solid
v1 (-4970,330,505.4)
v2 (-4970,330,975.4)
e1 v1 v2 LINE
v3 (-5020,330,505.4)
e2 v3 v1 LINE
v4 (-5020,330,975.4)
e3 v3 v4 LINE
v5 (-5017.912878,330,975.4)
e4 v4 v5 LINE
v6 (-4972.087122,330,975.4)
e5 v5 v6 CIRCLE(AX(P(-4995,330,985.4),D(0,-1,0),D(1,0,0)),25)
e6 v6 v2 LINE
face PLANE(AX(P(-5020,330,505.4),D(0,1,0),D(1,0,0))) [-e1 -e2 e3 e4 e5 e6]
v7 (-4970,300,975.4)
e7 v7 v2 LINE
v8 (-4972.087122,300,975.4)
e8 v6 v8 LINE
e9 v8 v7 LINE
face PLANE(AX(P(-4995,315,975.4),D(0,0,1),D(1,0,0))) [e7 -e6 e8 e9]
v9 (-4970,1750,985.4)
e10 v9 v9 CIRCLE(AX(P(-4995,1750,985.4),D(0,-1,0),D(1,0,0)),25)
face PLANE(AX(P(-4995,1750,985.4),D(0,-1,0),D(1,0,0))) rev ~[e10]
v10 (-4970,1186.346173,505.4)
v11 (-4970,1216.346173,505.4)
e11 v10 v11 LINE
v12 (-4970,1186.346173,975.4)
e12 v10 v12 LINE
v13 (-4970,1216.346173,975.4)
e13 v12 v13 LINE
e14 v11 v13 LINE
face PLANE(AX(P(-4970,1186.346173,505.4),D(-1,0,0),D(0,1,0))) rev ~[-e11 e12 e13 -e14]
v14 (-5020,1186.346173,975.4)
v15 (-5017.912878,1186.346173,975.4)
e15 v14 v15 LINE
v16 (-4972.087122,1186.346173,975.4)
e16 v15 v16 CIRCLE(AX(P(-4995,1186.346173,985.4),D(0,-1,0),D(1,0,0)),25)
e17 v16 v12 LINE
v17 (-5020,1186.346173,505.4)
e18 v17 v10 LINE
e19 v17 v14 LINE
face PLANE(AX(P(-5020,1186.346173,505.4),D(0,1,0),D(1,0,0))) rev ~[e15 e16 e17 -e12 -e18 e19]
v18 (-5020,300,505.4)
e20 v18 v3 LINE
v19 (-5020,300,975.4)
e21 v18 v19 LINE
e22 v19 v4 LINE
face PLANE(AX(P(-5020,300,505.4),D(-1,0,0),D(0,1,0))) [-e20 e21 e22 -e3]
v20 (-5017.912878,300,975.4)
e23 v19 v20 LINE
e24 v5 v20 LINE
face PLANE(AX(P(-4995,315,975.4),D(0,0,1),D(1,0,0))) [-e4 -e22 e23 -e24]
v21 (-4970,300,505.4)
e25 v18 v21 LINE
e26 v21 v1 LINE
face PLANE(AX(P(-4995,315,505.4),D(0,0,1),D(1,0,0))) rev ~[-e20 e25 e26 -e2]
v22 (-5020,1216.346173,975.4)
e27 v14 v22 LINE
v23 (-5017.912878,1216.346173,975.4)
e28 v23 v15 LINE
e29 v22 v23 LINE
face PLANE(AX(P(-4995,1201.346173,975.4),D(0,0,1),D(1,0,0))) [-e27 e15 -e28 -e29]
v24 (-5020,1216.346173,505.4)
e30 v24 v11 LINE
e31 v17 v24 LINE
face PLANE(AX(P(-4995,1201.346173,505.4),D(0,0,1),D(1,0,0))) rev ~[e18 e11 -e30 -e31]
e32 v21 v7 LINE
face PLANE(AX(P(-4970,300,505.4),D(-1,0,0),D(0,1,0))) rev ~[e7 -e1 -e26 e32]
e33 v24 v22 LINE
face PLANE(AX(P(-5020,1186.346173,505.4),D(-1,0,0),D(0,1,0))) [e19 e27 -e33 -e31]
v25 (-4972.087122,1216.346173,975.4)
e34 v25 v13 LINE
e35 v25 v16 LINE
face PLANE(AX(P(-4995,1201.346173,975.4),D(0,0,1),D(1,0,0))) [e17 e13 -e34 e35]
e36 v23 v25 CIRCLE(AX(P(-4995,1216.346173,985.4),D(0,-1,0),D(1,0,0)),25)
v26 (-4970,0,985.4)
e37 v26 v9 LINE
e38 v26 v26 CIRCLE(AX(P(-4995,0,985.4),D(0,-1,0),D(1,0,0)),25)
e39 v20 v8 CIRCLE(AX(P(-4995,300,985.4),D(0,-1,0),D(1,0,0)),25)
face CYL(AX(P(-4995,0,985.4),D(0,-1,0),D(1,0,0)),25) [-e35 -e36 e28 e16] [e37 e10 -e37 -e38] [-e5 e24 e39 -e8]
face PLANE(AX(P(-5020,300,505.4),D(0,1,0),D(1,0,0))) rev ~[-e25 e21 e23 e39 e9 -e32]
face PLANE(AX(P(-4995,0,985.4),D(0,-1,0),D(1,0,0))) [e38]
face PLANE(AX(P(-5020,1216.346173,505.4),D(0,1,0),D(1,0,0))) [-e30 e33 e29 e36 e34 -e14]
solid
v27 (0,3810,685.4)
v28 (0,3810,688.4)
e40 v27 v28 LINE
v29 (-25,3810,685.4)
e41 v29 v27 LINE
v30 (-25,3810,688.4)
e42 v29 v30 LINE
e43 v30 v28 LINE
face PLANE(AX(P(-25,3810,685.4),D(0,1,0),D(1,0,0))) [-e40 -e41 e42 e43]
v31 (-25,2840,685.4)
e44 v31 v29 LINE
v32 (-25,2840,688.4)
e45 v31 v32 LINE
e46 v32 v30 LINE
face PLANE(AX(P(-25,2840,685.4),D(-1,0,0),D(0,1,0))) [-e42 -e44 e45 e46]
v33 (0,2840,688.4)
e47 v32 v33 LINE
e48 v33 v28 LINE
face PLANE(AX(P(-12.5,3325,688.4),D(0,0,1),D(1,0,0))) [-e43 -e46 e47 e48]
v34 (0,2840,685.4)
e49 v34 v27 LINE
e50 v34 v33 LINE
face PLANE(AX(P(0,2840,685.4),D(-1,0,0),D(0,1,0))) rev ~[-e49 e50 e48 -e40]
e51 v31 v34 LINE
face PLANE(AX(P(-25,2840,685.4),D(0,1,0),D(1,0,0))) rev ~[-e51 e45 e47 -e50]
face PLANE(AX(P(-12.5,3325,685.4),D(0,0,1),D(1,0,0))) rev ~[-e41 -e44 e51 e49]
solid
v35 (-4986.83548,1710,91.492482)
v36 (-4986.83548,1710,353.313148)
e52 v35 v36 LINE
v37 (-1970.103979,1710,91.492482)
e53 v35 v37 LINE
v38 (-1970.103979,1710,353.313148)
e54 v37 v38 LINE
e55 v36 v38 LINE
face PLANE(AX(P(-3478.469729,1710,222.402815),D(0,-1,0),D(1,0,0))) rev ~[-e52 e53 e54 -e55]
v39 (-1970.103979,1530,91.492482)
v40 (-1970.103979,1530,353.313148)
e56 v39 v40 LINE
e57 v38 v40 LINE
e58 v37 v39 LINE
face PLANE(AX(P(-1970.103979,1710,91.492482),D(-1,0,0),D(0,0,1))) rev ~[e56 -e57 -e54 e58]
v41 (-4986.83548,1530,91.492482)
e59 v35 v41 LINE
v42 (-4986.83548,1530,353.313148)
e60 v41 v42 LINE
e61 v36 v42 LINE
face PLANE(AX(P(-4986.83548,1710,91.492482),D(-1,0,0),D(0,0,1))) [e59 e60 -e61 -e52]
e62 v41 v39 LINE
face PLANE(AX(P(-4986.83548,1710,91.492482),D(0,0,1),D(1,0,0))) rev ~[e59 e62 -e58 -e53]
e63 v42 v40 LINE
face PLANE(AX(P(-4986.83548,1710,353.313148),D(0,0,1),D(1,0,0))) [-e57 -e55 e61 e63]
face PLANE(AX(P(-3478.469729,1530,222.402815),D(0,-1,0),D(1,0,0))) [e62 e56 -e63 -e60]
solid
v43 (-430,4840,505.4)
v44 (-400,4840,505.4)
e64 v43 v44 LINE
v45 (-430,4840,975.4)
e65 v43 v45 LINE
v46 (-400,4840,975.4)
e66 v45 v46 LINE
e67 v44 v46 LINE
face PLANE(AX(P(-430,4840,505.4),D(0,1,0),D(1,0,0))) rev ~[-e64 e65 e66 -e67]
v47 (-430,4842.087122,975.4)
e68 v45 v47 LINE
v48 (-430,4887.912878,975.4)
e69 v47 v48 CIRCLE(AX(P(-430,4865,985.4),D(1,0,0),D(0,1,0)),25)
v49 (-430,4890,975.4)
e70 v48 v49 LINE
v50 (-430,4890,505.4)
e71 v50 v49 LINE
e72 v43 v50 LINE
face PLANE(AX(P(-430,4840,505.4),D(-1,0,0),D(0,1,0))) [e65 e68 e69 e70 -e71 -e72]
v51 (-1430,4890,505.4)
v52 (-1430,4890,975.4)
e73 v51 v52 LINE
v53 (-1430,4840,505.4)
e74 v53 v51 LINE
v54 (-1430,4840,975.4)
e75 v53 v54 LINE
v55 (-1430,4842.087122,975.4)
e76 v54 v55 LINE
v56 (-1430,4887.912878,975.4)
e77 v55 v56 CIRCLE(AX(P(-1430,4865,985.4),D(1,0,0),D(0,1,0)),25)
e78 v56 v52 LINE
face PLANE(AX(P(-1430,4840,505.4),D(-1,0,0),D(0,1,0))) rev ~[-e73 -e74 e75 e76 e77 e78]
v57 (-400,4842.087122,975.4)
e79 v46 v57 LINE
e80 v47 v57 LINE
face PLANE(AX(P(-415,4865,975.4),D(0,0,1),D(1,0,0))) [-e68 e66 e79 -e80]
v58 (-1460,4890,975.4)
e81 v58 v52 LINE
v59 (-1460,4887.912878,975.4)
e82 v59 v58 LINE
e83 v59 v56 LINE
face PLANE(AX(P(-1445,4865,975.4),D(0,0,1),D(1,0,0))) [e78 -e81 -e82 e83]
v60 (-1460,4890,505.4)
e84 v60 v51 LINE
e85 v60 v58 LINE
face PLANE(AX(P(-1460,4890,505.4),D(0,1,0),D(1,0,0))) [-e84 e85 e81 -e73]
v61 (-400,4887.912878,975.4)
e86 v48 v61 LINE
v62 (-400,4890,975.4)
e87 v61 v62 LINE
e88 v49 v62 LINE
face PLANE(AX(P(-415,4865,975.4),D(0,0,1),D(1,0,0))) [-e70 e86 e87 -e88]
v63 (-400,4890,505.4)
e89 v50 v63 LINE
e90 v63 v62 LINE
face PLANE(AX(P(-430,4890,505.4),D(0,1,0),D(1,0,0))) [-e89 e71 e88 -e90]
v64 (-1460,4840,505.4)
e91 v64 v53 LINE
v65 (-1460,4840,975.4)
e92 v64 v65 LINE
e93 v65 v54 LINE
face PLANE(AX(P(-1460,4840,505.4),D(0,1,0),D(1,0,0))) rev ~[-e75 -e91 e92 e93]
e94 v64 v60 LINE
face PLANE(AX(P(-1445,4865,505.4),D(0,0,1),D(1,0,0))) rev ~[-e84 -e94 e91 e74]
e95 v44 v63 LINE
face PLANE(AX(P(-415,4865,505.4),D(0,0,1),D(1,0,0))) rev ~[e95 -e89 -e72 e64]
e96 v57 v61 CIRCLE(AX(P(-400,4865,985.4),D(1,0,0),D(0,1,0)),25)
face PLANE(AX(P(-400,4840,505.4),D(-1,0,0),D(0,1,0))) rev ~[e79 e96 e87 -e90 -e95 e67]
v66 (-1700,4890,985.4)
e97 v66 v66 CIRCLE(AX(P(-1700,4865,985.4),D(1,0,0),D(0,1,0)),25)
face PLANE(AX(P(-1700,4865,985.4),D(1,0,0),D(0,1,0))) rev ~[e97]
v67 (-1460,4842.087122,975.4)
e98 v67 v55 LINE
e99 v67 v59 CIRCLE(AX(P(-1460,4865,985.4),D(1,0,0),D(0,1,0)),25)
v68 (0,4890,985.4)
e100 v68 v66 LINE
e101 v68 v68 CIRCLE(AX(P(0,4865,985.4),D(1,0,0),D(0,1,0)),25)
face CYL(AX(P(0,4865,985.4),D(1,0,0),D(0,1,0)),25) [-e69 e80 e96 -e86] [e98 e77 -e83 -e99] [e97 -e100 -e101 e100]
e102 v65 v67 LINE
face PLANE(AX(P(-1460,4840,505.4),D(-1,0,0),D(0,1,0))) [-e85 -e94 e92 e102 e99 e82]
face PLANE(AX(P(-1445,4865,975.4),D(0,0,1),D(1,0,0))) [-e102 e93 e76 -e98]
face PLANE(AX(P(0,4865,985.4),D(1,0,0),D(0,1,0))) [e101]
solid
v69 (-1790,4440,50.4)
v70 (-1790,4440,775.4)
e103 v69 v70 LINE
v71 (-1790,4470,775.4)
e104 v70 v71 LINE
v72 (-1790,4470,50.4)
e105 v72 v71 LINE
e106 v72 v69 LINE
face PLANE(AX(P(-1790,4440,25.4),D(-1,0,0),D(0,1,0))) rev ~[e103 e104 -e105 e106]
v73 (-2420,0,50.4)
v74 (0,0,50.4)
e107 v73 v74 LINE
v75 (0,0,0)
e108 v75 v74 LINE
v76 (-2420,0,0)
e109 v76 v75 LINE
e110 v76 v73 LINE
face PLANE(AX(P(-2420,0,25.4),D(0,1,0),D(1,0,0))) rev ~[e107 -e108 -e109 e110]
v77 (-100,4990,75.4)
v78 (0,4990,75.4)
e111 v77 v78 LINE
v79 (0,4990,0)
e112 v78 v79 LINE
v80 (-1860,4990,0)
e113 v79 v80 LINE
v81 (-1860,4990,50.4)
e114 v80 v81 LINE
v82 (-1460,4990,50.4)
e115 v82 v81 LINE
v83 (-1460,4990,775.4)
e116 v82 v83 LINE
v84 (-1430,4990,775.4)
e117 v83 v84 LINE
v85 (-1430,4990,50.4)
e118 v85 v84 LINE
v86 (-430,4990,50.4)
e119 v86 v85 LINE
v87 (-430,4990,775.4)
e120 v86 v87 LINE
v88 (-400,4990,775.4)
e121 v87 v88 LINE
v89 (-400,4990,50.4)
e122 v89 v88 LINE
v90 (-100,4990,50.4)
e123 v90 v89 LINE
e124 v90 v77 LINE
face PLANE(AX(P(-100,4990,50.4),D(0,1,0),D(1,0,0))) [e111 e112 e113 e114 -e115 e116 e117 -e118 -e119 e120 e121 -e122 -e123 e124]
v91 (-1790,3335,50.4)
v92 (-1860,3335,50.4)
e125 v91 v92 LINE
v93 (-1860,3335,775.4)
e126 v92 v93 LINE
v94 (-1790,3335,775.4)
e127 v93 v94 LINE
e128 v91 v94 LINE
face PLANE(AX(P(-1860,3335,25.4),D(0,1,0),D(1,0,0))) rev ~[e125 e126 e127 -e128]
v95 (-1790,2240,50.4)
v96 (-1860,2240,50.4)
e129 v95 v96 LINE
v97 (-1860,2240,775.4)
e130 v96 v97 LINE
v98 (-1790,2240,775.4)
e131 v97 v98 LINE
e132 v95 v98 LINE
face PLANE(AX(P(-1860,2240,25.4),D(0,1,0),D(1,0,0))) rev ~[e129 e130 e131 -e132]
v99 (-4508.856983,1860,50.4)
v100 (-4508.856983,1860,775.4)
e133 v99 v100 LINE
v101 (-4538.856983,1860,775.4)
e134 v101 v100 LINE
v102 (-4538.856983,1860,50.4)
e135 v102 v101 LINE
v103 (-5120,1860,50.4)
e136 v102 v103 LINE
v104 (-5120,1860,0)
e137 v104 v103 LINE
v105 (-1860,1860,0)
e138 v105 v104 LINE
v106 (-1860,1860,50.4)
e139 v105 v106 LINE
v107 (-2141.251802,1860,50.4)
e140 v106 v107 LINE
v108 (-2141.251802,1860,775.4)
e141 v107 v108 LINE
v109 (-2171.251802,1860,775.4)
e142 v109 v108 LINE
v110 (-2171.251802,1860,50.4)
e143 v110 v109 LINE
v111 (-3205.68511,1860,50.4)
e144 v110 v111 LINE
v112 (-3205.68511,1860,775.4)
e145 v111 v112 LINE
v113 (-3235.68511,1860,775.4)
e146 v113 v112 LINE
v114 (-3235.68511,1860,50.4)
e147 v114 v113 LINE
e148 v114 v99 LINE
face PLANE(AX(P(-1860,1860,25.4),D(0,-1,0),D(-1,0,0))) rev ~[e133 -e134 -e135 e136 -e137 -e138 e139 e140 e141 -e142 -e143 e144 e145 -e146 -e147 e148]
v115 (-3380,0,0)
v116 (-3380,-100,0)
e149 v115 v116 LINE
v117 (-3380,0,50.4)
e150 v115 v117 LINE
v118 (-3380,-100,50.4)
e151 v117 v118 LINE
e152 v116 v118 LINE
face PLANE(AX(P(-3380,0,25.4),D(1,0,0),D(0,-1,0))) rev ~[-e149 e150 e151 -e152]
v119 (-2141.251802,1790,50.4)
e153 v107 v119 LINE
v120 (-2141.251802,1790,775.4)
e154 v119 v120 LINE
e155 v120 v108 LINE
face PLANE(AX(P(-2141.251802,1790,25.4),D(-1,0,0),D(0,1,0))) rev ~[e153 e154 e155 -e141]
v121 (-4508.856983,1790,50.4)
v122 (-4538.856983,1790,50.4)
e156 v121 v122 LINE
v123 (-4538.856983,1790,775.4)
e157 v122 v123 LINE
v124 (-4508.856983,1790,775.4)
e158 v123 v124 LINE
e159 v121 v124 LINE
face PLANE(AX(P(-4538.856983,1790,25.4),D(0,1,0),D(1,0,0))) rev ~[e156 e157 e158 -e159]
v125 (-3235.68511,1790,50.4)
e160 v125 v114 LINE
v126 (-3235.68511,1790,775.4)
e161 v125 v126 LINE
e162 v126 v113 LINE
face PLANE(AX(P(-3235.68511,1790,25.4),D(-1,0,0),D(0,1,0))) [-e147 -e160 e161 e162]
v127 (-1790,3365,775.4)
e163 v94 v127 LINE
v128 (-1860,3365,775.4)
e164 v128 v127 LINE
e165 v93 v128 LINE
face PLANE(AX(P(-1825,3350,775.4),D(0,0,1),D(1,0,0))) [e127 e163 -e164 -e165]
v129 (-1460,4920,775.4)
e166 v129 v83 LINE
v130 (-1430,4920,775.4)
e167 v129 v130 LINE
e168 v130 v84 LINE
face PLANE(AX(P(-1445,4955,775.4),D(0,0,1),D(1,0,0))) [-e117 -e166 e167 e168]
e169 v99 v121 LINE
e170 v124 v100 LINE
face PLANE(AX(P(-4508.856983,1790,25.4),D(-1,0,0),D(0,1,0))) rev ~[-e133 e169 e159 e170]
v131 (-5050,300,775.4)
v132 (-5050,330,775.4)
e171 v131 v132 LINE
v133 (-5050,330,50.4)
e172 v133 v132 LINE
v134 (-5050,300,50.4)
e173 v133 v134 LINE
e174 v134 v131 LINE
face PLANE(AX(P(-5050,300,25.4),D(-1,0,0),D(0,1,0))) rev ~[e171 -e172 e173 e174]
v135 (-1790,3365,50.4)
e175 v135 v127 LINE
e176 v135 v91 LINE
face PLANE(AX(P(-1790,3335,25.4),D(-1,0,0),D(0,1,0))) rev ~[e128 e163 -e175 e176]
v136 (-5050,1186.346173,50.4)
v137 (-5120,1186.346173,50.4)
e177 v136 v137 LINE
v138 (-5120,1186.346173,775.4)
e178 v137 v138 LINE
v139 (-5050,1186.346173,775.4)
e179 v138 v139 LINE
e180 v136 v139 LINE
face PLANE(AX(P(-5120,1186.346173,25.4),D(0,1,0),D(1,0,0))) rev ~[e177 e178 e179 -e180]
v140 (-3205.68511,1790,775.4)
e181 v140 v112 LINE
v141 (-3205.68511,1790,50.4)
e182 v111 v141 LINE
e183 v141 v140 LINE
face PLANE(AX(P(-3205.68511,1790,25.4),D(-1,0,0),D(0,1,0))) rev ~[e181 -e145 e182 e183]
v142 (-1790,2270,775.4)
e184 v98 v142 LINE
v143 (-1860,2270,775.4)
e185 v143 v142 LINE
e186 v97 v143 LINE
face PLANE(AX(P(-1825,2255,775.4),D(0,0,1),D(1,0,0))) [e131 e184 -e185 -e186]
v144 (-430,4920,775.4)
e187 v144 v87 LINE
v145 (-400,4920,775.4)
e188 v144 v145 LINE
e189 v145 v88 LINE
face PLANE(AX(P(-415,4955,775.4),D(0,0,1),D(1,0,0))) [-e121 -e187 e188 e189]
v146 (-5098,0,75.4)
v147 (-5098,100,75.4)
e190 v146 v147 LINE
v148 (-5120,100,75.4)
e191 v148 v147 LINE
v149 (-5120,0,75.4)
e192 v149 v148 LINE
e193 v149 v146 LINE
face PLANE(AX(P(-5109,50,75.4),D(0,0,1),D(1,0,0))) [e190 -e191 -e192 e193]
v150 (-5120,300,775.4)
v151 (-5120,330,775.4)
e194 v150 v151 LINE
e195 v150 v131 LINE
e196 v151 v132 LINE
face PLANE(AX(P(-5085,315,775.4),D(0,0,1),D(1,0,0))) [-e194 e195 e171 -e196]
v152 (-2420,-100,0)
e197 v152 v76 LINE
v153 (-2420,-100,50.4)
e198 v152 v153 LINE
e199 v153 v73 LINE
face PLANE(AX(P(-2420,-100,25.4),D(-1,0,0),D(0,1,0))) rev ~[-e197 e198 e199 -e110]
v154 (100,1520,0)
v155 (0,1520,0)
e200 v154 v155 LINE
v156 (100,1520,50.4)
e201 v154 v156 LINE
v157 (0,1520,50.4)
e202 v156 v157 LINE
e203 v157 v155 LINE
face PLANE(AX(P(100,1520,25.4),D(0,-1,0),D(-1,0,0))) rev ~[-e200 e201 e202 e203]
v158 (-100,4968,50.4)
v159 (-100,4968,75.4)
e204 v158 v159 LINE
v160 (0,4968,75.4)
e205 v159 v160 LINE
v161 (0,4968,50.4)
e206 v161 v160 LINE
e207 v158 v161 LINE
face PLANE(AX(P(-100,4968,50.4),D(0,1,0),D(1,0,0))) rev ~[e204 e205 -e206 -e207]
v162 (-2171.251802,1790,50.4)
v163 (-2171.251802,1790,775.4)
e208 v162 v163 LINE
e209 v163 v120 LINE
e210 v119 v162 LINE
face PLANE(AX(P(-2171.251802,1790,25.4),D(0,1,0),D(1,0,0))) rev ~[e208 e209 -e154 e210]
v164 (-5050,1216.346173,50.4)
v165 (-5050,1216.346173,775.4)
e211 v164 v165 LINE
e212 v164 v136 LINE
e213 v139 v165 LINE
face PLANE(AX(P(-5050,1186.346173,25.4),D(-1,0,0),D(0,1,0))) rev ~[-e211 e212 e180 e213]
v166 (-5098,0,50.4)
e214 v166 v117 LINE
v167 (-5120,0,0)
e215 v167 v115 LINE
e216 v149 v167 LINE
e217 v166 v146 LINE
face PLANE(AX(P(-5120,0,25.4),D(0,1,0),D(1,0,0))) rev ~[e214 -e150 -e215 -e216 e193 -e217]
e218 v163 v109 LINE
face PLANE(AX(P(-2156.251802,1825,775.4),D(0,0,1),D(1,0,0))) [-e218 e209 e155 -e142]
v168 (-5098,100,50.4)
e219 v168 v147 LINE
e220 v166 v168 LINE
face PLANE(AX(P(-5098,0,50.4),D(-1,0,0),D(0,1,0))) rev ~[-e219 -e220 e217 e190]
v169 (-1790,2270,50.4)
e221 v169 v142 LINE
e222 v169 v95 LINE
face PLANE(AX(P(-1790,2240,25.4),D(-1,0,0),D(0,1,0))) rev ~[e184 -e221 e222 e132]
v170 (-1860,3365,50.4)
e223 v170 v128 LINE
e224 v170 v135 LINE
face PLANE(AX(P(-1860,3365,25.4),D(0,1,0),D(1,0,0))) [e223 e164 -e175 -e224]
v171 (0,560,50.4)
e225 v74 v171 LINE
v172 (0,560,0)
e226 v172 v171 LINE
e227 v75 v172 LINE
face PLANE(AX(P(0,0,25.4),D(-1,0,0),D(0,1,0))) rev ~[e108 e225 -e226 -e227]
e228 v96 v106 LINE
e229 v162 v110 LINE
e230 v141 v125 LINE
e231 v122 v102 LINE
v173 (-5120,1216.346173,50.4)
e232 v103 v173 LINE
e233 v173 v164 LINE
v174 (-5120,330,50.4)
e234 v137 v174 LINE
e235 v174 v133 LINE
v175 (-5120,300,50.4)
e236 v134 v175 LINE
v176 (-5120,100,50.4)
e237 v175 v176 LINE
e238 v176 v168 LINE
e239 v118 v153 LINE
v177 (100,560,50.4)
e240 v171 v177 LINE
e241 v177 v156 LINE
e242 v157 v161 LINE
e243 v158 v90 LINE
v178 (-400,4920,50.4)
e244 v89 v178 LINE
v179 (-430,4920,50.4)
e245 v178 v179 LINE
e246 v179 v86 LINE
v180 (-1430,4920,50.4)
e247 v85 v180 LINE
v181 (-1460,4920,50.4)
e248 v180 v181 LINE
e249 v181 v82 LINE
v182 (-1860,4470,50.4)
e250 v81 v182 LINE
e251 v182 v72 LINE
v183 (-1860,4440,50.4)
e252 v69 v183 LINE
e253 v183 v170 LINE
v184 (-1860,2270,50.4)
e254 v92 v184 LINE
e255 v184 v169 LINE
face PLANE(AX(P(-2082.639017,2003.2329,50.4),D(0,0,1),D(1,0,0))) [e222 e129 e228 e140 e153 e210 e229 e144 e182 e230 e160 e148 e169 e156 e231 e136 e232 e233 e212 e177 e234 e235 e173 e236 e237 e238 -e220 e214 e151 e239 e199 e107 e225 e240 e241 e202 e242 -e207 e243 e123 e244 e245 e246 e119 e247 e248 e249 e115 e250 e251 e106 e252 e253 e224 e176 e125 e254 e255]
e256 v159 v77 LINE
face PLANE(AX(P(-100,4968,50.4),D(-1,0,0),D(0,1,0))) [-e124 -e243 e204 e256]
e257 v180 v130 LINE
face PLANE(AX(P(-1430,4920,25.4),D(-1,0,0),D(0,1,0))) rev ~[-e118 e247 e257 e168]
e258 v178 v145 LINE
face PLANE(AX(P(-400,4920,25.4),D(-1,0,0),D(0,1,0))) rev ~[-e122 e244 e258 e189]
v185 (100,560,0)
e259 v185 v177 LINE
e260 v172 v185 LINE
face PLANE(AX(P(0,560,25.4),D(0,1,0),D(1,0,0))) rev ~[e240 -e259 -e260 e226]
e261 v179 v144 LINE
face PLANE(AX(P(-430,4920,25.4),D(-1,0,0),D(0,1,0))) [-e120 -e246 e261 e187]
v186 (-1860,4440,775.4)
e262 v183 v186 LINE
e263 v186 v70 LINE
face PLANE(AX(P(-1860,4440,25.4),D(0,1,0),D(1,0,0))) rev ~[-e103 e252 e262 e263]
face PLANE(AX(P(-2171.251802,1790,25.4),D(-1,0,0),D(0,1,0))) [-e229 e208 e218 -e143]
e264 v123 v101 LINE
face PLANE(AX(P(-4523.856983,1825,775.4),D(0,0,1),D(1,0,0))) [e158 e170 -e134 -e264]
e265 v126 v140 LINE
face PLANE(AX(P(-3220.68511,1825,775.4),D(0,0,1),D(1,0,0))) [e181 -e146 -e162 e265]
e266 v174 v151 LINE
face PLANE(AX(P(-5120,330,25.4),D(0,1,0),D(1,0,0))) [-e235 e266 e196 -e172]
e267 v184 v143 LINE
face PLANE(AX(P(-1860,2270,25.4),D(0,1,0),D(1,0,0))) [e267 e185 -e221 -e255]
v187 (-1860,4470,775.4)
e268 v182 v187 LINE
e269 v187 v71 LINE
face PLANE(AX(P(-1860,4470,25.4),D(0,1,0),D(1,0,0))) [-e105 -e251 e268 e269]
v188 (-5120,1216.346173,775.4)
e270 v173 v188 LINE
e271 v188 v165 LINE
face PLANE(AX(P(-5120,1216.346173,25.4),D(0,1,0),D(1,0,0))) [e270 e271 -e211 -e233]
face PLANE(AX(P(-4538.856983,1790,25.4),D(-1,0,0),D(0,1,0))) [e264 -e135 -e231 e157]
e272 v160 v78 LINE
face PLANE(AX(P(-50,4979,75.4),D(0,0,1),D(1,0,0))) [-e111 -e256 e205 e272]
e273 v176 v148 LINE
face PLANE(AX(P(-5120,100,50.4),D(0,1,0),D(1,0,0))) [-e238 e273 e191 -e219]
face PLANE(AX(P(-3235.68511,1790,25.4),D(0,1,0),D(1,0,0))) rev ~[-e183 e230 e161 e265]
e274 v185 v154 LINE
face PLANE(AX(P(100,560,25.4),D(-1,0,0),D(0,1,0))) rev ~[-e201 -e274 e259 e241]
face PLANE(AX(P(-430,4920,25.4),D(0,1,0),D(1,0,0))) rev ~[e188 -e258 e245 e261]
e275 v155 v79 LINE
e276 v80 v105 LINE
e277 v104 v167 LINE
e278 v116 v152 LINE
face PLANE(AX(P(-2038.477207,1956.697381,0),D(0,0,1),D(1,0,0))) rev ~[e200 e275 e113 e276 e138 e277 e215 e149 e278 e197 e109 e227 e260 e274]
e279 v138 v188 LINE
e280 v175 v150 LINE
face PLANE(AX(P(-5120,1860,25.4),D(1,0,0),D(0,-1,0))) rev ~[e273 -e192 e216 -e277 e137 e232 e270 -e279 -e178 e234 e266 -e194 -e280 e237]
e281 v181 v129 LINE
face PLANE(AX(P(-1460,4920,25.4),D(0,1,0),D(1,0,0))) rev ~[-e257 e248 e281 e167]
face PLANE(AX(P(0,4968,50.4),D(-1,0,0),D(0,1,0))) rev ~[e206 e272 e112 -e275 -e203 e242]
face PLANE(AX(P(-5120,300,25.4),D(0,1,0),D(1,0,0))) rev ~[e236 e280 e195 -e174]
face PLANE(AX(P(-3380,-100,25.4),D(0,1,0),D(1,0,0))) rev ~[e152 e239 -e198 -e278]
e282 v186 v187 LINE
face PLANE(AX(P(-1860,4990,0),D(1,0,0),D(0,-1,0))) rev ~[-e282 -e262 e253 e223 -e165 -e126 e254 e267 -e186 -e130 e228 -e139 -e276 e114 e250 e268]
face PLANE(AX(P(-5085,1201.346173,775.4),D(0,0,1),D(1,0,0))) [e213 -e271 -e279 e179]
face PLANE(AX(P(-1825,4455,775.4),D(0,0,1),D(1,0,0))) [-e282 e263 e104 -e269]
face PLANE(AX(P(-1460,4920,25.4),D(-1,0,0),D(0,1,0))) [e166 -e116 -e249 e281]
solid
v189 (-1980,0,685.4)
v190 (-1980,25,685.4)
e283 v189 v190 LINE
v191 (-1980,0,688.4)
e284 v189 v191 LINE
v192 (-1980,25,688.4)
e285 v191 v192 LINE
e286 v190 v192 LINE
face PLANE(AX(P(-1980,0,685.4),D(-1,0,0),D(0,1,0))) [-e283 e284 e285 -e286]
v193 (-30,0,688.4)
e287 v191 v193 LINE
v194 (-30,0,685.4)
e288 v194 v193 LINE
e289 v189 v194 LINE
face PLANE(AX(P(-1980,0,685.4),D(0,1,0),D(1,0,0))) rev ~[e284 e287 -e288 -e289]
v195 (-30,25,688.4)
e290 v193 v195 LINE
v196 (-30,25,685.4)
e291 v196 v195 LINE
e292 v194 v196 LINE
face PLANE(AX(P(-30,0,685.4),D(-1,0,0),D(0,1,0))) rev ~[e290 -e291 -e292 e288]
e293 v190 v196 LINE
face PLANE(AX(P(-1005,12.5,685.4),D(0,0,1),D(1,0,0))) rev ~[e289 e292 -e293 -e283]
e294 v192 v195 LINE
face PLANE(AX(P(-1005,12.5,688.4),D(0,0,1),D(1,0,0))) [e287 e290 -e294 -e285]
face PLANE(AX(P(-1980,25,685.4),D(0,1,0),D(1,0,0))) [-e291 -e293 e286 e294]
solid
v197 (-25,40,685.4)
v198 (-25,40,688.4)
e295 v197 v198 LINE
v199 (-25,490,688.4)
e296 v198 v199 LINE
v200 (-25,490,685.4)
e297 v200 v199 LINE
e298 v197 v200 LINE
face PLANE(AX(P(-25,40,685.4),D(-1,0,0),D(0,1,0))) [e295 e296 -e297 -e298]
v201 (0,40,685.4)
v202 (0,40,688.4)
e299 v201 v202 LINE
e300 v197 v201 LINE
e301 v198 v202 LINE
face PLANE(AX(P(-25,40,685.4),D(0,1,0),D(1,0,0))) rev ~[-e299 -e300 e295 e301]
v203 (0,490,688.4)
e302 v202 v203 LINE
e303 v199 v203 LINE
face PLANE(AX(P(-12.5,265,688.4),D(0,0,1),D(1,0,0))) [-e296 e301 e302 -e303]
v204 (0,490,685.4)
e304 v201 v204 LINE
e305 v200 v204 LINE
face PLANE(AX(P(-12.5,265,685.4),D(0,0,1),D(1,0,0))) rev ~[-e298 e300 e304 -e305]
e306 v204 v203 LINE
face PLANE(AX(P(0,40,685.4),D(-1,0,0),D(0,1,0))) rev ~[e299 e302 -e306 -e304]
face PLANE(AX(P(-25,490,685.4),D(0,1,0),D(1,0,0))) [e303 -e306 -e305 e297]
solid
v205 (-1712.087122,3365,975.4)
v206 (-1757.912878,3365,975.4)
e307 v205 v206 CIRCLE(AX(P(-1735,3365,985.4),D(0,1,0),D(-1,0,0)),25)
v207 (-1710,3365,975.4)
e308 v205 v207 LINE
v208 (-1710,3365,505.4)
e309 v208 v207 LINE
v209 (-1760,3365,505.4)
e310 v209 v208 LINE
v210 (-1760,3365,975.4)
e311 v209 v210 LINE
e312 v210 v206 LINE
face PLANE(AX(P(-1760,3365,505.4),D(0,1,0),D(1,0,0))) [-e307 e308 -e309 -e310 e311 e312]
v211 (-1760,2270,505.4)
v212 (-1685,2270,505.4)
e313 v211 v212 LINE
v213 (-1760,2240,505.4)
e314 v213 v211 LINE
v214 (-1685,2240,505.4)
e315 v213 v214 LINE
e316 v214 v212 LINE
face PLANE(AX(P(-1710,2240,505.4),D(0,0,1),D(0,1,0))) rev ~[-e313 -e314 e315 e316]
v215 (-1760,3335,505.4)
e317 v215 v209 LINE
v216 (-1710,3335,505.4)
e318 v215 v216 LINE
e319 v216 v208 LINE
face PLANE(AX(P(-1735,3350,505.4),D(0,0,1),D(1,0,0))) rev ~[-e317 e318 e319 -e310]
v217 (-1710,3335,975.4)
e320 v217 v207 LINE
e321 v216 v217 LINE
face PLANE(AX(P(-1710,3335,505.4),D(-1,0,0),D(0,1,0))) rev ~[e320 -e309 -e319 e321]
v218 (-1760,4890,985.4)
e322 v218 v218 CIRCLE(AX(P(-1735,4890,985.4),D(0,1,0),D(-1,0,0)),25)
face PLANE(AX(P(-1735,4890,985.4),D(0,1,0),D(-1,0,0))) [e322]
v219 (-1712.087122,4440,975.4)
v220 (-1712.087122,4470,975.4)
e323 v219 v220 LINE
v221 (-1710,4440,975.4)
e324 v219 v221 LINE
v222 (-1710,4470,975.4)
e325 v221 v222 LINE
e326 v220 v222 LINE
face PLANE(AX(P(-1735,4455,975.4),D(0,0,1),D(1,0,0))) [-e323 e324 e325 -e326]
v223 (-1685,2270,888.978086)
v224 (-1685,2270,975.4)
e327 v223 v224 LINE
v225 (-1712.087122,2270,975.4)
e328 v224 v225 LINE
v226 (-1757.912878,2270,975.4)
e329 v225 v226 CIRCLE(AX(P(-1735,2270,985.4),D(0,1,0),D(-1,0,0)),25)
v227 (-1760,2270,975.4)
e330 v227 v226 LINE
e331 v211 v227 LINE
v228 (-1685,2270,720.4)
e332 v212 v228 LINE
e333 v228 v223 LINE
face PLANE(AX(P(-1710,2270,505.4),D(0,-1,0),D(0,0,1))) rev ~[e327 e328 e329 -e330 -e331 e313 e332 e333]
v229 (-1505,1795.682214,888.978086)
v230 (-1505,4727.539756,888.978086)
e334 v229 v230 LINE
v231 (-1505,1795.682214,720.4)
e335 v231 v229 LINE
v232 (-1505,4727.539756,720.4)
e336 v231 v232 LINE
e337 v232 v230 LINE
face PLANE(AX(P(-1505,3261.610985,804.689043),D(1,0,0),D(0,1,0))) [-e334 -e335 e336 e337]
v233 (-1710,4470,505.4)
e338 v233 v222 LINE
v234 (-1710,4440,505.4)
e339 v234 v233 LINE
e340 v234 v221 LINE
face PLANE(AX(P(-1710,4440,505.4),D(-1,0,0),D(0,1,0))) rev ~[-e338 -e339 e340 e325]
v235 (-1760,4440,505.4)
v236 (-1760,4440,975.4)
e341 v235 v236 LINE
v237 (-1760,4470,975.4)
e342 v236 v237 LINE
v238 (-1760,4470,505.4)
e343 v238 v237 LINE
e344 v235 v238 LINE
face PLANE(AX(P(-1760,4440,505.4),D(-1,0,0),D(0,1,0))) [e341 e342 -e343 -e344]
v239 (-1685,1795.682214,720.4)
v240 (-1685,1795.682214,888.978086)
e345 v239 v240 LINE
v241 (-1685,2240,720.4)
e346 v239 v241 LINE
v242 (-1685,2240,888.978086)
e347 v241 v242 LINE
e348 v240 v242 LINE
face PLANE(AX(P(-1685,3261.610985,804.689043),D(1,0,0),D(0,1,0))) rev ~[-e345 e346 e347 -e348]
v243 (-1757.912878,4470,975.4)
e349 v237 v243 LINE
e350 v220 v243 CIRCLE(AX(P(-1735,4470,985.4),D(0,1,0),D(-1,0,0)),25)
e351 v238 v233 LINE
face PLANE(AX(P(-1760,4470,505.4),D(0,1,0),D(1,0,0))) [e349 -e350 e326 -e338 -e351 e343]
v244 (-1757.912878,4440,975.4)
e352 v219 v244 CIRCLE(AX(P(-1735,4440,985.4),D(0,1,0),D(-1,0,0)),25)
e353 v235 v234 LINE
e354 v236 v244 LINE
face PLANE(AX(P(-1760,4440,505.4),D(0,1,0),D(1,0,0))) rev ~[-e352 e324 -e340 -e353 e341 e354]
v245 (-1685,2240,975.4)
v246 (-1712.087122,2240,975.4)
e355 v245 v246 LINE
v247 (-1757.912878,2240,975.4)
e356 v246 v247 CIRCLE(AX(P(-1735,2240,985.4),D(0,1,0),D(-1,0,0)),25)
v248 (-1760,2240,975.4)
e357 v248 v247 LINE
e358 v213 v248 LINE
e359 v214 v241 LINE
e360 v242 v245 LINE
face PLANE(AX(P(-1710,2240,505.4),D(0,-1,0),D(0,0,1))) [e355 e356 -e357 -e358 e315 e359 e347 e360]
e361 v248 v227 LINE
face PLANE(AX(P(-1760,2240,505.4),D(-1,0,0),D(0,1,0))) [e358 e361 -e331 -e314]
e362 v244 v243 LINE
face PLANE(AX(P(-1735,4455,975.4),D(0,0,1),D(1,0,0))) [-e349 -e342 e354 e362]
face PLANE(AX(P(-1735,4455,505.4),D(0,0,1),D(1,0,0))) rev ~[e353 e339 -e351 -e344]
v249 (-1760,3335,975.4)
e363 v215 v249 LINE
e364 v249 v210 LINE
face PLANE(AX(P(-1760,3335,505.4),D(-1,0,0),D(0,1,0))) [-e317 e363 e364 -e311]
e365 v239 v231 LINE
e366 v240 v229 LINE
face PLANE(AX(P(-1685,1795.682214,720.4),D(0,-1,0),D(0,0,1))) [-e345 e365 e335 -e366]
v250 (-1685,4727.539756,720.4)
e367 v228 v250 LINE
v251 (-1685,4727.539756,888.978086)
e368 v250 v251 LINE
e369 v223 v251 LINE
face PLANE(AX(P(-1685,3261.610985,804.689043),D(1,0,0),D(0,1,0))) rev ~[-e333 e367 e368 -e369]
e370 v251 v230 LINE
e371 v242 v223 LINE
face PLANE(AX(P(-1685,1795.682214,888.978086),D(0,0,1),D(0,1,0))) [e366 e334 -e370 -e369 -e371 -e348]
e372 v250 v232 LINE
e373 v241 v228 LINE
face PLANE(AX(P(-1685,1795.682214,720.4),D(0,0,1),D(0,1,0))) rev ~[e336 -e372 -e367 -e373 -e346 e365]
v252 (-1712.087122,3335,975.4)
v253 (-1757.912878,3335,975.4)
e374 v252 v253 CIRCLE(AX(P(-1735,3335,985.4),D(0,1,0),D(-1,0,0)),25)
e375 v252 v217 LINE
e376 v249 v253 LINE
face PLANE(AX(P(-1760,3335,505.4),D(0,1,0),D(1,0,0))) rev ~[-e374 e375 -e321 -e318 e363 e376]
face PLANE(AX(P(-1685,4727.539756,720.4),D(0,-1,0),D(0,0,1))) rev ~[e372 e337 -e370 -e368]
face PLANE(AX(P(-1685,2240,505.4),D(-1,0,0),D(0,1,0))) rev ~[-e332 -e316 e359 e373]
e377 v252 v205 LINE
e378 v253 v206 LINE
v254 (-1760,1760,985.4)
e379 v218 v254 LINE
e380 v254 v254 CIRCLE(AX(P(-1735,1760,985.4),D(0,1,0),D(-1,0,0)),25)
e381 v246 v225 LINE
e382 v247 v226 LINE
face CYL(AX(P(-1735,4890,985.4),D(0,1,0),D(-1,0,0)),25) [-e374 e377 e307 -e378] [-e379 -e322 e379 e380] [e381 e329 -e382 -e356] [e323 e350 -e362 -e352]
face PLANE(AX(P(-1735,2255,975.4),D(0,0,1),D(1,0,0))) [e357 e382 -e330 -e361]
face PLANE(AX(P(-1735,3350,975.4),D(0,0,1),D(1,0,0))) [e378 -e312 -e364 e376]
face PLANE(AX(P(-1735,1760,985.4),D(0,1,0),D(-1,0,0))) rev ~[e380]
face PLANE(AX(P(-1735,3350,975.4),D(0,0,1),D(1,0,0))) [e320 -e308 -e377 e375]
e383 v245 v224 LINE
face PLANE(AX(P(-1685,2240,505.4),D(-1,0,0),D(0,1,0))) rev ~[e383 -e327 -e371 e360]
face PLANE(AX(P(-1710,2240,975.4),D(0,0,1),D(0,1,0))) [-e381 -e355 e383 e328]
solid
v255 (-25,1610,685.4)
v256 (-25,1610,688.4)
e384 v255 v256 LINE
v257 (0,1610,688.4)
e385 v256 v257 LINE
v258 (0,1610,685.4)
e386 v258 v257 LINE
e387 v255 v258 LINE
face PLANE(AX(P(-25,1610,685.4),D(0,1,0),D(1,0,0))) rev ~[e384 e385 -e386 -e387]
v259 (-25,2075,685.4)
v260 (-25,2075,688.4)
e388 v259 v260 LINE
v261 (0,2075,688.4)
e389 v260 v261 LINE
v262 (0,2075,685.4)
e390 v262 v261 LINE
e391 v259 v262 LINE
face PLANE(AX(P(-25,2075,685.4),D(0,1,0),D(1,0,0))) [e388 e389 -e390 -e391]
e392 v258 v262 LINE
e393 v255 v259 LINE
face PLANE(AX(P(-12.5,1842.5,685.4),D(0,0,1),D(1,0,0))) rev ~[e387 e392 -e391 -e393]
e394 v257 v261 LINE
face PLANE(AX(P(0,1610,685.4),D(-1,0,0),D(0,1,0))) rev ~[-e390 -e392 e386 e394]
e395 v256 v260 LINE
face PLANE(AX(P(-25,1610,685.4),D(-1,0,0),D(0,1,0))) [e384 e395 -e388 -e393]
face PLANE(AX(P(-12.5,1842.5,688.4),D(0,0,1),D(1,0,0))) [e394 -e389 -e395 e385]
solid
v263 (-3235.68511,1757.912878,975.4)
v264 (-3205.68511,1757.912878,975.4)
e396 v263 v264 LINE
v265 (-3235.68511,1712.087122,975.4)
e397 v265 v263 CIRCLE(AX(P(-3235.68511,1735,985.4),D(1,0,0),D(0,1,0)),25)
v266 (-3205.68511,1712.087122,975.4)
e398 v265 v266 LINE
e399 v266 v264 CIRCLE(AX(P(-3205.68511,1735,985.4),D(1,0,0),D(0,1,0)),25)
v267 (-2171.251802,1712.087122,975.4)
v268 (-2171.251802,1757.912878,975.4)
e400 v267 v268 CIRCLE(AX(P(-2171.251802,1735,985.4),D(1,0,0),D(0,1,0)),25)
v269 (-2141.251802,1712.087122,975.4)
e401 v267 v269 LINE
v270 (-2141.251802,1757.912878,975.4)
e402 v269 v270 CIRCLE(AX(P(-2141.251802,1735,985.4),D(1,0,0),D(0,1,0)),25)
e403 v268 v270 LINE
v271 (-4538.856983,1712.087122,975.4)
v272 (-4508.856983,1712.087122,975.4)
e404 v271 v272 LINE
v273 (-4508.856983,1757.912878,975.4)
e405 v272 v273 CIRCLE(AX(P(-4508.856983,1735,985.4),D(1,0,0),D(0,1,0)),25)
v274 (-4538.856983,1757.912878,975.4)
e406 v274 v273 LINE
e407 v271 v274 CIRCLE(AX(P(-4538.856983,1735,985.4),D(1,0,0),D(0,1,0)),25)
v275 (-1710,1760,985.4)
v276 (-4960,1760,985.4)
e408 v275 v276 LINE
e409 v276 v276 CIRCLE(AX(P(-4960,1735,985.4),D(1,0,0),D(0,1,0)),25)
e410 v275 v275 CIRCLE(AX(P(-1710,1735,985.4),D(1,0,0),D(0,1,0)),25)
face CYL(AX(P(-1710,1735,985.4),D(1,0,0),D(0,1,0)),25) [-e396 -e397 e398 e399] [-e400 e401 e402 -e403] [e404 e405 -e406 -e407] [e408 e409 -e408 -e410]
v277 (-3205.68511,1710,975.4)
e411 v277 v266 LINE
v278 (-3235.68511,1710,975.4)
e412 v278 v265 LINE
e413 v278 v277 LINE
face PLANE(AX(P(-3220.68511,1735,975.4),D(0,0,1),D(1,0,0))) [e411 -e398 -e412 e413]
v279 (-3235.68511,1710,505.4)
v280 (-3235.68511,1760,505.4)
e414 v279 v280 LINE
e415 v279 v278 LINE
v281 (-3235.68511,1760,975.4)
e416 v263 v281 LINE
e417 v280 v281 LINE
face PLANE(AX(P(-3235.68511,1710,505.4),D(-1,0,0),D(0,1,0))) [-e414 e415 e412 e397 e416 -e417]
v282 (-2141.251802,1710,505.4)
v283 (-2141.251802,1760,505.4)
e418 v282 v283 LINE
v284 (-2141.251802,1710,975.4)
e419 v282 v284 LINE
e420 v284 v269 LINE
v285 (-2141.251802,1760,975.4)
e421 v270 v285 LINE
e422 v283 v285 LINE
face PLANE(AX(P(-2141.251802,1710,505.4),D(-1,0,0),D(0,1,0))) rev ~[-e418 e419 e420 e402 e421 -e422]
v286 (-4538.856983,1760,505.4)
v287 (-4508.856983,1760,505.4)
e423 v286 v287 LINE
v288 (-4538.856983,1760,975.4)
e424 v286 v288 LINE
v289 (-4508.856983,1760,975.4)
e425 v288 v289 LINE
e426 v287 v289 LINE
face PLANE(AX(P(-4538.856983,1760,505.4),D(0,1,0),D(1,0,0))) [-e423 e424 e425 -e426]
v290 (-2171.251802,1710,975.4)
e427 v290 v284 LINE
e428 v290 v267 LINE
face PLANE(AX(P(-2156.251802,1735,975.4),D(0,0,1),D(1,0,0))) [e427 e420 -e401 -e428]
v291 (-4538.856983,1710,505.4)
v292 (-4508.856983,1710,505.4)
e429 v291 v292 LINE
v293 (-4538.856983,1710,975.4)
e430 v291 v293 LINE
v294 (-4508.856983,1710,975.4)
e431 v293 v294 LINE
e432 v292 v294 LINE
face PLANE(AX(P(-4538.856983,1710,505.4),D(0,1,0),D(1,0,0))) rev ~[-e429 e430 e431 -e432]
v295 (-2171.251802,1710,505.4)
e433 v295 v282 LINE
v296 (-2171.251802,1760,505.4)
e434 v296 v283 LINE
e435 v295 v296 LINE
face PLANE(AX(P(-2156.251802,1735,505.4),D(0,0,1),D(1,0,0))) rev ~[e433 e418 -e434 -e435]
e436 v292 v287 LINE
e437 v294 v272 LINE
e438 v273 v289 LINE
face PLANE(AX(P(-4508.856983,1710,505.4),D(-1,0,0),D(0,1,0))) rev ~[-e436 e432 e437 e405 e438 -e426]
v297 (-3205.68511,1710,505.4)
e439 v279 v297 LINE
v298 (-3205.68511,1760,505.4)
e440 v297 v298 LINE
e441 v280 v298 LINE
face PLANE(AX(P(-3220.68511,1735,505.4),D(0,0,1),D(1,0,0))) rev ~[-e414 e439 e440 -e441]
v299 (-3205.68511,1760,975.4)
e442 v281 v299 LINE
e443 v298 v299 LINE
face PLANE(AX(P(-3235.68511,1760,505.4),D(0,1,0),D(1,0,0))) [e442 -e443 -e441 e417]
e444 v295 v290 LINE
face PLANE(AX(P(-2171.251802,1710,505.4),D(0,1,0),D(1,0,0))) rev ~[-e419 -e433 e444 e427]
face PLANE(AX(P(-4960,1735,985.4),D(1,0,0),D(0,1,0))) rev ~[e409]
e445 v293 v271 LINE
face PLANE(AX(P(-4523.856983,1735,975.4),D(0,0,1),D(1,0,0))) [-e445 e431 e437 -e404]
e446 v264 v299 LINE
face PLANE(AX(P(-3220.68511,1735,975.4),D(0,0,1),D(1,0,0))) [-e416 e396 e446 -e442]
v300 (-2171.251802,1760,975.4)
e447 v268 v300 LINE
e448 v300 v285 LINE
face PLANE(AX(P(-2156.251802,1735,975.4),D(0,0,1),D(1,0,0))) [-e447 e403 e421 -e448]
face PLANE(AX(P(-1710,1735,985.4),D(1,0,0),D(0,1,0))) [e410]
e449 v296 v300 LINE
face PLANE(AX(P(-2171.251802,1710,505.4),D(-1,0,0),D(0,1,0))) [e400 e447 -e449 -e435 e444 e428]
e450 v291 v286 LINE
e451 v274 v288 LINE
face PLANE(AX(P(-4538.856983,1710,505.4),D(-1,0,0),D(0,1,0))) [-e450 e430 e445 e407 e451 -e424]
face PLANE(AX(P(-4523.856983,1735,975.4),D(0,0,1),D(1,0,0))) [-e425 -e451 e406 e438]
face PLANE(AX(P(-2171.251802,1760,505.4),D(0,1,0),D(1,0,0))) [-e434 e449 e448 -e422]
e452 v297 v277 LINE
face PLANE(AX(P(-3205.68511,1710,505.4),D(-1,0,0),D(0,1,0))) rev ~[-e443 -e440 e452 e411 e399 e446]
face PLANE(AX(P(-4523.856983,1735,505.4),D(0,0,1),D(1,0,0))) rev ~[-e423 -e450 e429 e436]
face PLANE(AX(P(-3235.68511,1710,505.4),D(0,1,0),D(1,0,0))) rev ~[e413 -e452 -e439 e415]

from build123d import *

# Parameters (mm, degrees)
F1_DEPTH  = 25.4
F2_W      = 30
F2_H      = 70
F2_W_2    = 70
F2_H_2    = 30
F3_DEPTH  = 750
F5_W      = 50
F5_H      = 30
F6_DEPTH  = 470
F5_W_2    = 30
F5_H_2    = 50
F7_R      = 25
F8_DEPTH  = 1700
F9_R      = 25
F10_DEPTH = 3130
F11_R     = 25
F12_DEPTH = 3250
F13_R     = 25
F14_DEPTH = 1750
F16_W     = 25
F16_H     = 970
F17_DEPTH = 3
F16_H_2   = 465
F16_W_2   = 1950
F16_H_3   = 25
F16_H_4   = 450
F18_DEPTH = 25
F19_W     = 100
F19_H     = 22
F19_W_2   = 22
F19_H_2   = 100
F20_DEPTH = 25
F21_DEPTH = 25
F22_W     = 2931.857542173
F22_H     = 168.5780864702
F23_DEPTH = 180
F24_W     = 3016.7315006256
F24_H     = 261.820666492
F25_DEPTH = 180


with BuildPart() as f1:
    # F0 (on Top) → F1 (new body)
    with BuildSketch(Plane.XY):
        Polygon((-2420, 0), (0, 0), (0, 560), (100, 560), (100, 1520), (0, 1520), (0, 4990), (-1860, 4990), (-1860, 1860), (-5120, 1860), (-5120, 0), (-3380, 0), (-3380, -100), (-2420, -100), align=None)
    extrude(amount=F1_DEPTH)

    # F2 (on face) → F3 (join)
    with BuildSketch(Plane.XY.offset(25.4)):
        with Locations((-415, 4955)):
            Rectangle(F2_W, F2_H)
        with Locations((-1825, 4455)):
            Rectangle(F2_W_2, F2_H_2)
        with Locations((-1825, 2255)):
            Rectangle(F2_W_2, F2_H_2)
        with Locations((-2156.2518024445, 1825)):
            Rectangle(F2_W, F2_H)
        with Locations((-3220.6851100922, 1825)):
            Rectangle(F2_W, F2_H)
        with Locations((-4523.8569831848, 1825)):
            Rectangle(F2_W, F2_H)
        with Locations((-1445, 4955)):
            Rectangle(F2_W, F2_H)
        with Locations((-5085, 315)):
            Rectangle(F2_W_2, F2_H_2)
        with Locations((-1825, 3350)):
            Rectangle(F2_W_2, F2_H_2)
        with Locations((-5085, 1201.3461732864)):
            Rectangle(F2_W_2, F2_H_2)
    extrude(amount=F3_DEPTH)

    # F2 (on face) → F18 (join)
    with BuildSketch(Plane.XY.offset(25.4)):
        Polygon((-430, 4920), (-430, 4990), (-1430, 4990), (-1430, 4920), (-1460, 4920), (-1460, 4990), (-1860, 4990), (-1860, 4470), (-1790, 4470), (-1790, 4440), (-1860, 4440), (-1860, 3365), (-1790, 3365), (-1790, 3335), (-1860, 3335), (-1860, 2270), (-1790, 2270), (-1790, 2240), (-1860, 2240), (-1860, 1860), (-2141.2518024445, 1860), (-2141.2518024445, 1790), (-2171.2518024445, 1790), (-2171.2518024445, 1860), (-3205.6851100922, 1860), (-3205.6851100922, 1790), (-3235.6851100922, 1790), (-3235.6851100922, 1860), (-4508.8569831848, 1860), (-4508.8569831848, 1790), (-4538.8569831848, 1790), (-4538.8569831848, 1860), (-5120, 1860), (-5120, 1216.3461732864), (-5050, 1216.3461732864), (-5050, 1186.3461732864), (-5120, 1186.3461732864), (-5120, 330), (-5050, 330), (-5050, 300), (-5120, 300), (-5120, 0), (-3380, 0), (-3380, -100), (-2420, -100), (-2420, 0), (0, 0), (0, 560), (100, 560), (100, 1520), (0, 1520), (0, 4990), (-400, 4990), (-400, 4920), align=None)
    extrude(amount=F18_DEPTH)

    # F19 (on face) → F20 (join)
    with BuildSketch(Plane.XY.offset(50.4)):
        with Locations((-50, 4979)):
            Rectangle(F19_W, F19_H)
        with Locations((-5109, 50)):
            Rectangle(F19_W_2, F19_H_2)
    extrude(amount=F20_DEPTH)


with BuildPart() as f6:
    # F5 (on offset) → F6 (new body)
    with BuildSketch(Plane.XY.offset(505.4)):
        with Locations((-1735, 4455)):
            Rectangle(F5_W, F5_H)
    extrude(amount=F6_DEPTH)



with BuildPart() as f6b:
    # F5 (on offset) → F6, piece 2 (new body)
    with BuildSketch(Plane.XY.offset(505.4)):
        with Locations((-1445, 4865)):
            Rectangle(F5_W_2, F5_H_2)
    extrude(amount=F6_DEPTH)



with BuildPart() as f6c:
    # F5 (on offset) → F6, piece 3 (new body)
    with BuildSketch(Plane.XY.offset(505.4)):
        with Locations((-415, 4865)):
            Rectangle(F5_W_2, F5_H_2)
    extrude(amount=F6_DEPTH)


with BuildPart() as f6d:
    # F5 (on offset) → F6, piece 4 (new body)
    with BuildSketch(Plane.XY.offset(505.4)):
        with Locations((-1735, 2255)):
            Rectangle(F5_W, F5_H)
    extrude(amount=F6_DEPTH)


with BuildPart() as f6e:
    # F5 (on offset) → F6, piece 5 (new body)
    with BuildSketch(Plane.XY.offset(505.4)):
        with Locations((-2156.2518024445, 1735)):
            Rectangle(F5_W_2, F5_H_2)
    extrude(amount=F6_DEPTH)



with BuildPart() as f6f:
    # F5 (on offset) → F6, piece 6 (new body)
    with BuildSketch(Plane.XY.offset(505.4)):
        with Locations((-3220.6851100922, 1735)):
            Rectangle(F5_W_2, F5_H_2)
    extrude(amount=F6_DEPTH)


with BuildPart() as f6g:
    # F5 (on offset) → F6, piece 7 (new body)
    with BuildSketch(Plane.XY.offset(505.4)):
        with Locations((-4523.8569831848, 1735)):
            Rectangle(F5_W_2, F5_H_2)
    extrude(amount=F6_DEPTH)


with BuildPart() as f6h:
    # F5 (on offset) → F6, piece 8 (new body)
    with BuildSketch(Plane.XY.offset(505.4)):
        with Locations((-4995, 315)):
            Rectangle(F5_W, F5_H)
    extrude(amount=F6_DEPTH)



with BuildPart() as f6i:
    # F5 (on offset) → F6, piece 9 (new body)
    with BuildSketch(Plane.XY.offset(505.4)):
        with Locations((-4995, 1201.3461732864)):
            Rectangle(F5_W, F5_H)
    extrude(amount=F6_DEPTH)


with BuildPart() as f6j:
    # F5 (on offset) → F6, piece 10 (new body)
    with BuildSketch(Plane.XY.offset(505.4)):
        with Locations((-1735, 3350)):
            Rectangle(F5_W, F5_H)
    extrude(amount=F6_DEPTH)


with BuildPart() as f6b_1:
    add(f6b.part)

    add(f6c.part)  # F8 merges F6c
    # F7 (on face) → F8 (join)
    with BuildSketch(Plane.YZ):
        with Locations((4865, 985.4)):
            Circle(F7_R)
    extrude(amount=-F8_DEPTH)


with BuildPart() as f6_1:
    add(f6.part)

    add(f6d.part)  # F10 merges F6d

    add(f6j.part)  # F10 merges F6j
    # F9 (on face) → F10 (join)
    with BuildSketch(Plane(origin=(0, 4890, 0), x_dir=(-1, 0, 0), z_dir=(0, 1, 0))):
        with Locations((1735, 985.4)):
            Circle(F9_R)
    extrude(amount=-F10_DEPTH)

    # F21 (add): a face of the model
    f21_faces = [f6_1.faces().sort_by_distance(p)[0] for p in [
        (-1710, 2255, 740.4),
    ]]
    extrude(f21_faces, amount=F21_DEPTH)

    # F22 (on face) → F23 (join)
    with BuildSketch(Plane.YZ.offset(-1685)):
        with Locations((3261.6109848022, 804.6890432351)):
            Rectangle(F22_W, F22_H)
    extrude(amount=F23_DEPTH)


with BuildPart() as f6e_1:
    add(f6e.part)

    add(f6f.part)  # F12 merges F6f

    add(f6g.part)  # F12 merges F6g
    # F11 (on face) → F12 (join)
    with BuildSketch(Plane.YZ.offset(-1710)):
        with Locations((1735, 985.4)):
            Circle(F11_R)
    extrude(amount=-F12_DEPTH)


with BuildPart() as f6h_1:
    add(f6h.part)

    add(f6i.part)  # F14 merges F6i
    # F13 (on face) → F14 (join)
    with BuildSketch(Plane.XZ):
        with Locations((-4995, 985.4)):
            Circle(F13_R)
    extrude(amount=-F14_DEPTH)


with BuildPart() as f17:
    # F16 (on offset) → F17 (new body)
    with BuildSketch(Plane.XY.offset(685.4)):
        with Locations((-12.5, 3325)):
            Rectangle(F16_W, F16_H)
    extrude(amount=F17_DEPTH)


with BuildPart() as f17b:
    # F16 (on offset) → F17, piece 2 (new body)
    with BuildSketch(Plane.XY.offset(685.4)):
        with Locations((-12.5, 1842.5)):
            Rectangle(F16_W, F16_H_2)
    extrude(amount=F17_DEPTH)


with BuildPart() as f17c:
    # F16 (on offset) → F17, piece 3 (new body)
    with BuildSketch(Plane.XY.offset(685.4)):
        with Locations((-1005, 12.5)):
            Rectangle(F16_W_2, F16_H_3)
    extrude(amount=F17_DEPTH)


with BuildPart() as f17d:
    # F16 (on offset) → F17, piece 4 (new body)
    with BuildSketch(Plane.XY.offset(685.4)):
        with Locations((-12.5, 265)):
            Rectangle(F16_W, F16_H_4)
    extrude(amount=F17_DEPTH)


with BuildPart() as f25:
    # F24 (on face) → F25 (new body)
    with BuildSketch(Plane.XZ.offset(-1710)):
        with Locations((-3478.4697294235, 222.4028147757)):
            Rectangle(F24_W, F24_H)
    extrude(amount=F25_DEPTH)


solid = Compound([f1.part, f6b_1.part, f6_1.part, f6e_1.part, f6h_1.part, f17.part, f17b.part, f17c.part, f17d.part, f25.part])
